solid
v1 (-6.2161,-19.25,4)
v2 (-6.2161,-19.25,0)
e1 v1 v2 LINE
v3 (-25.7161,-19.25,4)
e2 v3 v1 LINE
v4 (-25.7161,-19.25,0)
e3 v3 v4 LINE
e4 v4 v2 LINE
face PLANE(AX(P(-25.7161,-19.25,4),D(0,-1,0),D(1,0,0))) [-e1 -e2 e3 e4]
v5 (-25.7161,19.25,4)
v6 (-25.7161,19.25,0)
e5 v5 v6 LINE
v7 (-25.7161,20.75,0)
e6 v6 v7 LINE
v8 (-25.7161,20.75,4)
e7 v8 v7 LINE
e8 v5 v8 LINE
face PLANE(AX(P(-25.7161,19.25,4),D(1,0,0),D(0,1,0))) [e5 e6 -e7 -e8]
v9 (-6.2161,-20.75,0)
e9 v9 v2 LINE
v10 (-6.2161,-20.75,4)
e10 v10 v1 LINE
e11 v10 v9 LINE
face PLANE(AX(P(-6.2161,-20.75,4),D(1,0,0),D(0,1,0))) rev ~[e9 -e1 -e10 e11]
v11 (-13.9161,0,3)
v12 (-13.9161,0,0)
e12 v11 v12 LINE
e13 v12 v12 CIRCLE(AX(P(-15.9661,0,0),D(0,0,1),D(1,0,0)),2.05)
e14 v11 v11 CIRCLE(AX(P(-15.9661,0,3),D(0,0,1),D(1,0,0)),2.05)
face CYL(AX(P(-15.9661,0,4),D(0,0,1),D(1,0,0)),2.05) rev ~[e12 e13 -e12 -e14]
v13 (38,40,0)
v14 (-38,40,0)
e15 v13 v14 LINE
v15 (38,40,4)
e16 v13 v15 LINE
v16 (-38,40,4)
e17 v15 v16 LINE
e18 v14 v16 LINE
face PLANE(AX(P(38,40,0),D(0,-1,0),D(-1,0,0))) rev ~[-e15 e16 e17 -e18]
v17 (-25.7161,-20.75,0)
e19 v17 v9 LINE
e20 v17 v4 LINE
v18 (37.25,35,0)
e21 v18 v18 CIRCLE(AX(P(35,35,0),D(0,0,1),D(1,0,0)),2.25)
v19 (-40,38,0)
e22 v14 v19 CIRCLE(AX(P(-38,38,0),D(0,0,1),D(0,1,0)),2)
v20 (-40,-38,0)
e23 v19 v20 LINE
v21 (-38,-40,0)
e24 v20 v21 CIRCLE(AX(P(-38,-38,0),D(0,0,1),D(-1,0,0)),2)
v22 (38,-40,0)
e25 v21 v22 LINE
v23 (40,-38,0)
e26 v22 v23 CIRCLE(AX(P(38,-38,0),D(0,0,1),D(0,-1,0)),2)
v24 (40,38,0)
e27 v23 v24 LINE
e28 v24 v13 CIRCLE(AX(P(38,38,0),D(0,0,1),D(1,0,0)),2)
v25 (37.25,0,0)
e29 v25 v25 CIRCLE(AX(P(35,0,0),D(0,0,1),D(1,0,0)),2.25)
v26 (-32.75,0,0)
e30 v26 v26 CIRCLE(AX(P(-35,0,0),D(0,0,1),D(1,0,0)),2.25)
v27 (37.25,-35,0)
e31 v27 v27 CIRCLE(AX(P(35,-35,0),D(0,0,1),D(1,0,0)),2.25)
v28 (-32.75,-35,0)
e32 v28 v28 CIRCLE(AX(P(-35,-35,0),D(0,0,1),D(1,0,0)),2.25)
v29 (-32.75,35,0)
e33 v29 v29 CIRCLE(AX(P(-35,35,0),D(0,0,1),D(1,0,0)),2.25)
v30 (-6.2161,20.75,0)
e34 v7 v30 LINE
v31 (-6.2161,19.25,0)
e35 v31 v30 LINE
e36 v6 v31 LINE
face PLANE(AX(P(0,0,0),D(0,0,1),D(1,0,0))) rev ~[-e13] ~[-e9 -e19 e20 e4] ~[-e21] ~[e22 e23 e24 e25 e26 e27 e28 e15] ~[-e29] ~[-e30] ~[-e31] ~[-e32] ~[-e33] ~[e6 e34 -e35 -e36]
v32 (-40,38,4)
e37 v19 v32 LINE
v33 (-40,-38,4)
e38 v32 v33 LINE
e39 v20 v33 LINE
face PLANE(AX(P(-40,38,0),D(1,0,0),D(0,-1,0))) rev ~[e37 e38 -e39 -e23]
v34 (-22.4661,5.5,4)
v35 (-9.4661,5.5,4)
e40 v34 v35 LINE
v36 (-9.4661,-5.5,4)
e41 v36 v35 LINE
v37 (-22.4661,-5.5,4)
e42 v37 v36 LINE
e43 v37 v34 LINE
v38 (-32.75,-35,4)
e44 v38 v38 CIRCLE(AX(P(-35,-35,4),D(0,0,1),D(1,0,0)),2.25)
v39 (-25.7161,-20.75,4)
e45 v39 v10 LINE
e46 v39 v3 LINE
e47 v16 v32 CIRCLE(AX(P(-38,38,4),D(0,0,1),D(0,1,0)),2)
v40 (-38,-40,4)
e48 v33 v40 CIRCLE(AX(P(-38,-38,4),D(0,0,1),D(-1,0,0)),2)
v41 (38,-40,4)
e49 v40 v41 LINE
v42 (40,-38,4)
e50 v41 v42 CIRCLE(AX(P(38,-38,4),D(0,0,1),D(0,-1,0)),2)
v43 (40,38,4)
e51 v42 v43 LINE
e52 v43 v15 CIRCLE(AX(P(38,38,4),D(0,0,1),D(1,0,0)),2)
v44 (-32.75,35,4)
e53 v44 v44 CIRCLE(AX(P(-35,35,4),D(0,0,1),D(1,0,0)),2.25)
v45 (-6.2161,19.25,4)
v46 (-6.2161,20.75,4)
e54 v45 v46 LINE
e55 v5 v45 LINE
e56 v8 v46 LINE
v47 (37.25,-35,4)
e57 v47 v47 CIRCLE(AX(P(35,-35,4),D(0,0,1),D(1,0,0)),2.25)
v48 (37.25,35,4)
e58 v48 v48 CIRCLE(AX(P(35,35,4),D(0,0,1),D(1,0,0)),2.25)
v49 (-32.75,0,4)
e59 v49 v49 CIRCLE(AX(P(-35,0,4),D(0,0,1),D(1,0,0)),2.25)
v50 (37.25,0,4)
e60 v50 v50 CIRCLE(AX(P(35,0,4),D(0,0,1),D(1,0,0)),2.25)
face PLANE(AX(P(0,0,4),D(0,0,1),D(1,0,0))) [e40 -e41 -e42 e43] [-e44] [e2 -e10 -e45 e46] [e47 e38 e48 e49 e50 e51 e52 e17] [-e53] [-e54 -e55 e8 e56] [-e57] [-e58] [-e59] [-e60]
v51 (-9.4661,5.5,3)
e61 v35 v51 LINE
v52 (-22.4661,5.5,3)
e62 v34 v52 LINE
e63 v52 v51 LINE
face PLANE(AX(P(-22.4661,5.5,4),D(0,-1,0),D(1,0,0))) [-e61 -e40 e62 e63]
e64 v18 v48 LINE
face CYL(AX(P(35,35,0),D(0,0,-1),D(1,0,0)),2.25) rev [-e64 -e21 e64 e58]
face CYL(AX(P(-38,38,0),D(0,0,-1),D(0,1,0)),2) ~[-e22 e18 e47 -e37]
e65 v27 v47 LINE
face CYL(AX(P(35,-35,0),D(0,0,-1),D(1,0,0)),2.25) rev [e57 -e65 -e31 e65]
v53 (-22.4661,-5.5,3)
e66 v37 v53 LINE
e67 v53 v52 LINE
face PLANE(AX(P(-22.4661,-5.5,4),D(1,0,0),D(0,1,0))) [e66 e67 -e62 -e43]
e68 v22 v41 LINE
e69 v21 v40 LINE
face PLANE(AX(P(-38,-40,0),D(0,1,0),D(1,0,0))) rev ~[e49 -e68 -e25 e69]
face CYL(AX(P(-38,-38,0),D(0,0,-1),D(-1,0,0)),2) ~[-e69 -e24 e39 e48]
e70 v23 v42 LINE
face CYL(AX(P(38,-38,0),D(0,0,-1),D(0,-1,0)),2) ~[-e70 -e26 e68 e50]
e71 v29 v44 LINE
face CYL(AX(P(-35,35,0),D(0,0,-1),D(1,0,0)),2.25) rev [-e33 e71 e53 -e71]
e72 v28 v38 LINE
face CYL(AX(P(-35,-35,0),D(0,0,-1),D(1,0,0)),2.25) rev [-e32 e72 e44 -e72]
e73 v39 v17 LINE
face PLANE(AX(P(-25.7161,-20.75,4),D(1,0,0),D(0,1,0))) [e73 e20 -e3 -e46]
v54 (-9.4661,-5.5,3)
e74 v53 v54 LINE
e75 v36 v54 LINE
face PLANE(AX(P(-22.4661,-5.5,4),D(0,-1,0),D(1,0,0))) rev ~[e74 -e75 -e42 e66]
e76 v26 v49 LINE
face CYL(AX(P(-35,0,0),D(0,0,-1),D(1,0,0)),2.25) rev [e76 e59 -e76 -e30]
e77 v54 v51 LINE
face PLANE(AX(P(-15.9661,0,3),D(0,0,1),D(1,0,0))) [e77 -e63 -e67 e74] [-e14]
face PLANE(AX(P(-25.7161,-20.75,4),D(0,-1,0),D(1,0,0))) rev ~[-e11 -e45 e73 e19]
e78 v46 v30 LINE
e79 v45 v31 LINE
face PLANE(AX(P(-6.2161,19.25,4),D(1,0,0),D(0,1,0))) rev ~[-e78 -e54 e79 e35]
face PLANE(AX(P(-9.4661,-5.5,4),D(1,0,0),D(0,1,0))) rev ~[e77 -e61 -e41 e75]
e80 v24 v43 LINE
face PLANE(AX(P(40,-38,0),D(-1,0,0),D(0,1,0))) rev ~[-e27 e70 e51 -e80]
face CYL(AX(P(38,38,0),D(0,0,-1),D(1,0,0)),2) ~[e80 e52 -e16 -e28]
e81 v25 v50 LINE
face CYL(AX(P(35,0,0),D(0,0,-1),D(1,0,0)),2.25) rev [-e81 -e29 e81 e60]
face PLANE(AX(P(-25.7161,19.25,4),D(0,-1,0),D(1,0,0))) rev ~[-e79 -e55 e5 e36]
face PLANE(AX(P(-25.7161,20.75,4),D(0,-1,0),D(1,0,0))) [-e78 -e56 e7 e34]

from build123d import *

# Parameters (mm, degrees)
F0_R     = 2.25
F1_DEPTH = 4
F2_R     = 2.05
F3_DEPTH = 5
F4_W     = 13
F4_H     = 11
F5_DEPTH = 1
F6_W     = 19.5
F6_H     = 1.5
F7_DEPTH = 25


# Not quite as in the source:
# - a feature names something its author has since deleted; it is built from what else it names


with BuildPart() as f1:
    # F0 (on Top) → F1 (new body)
    with BuildSketch(Plane.XY):
        with BuildLine():
            ThreePointArc((40, 38), (39.4142135624, 39.4142135624), (38, 40))
            Line((38, 40), (-38, 40))
            ThreePointArc((-38, 40), (-39.4142135624, 39.4142135624), (-40, 38))
            Line((-40, 38), (-40, -38))
            ThreePointArc((-40, -38), (-39.4142135624, -39.4142135624), (-38, -40))
            Line((-38, -40), (38, -40))
            ThreePointArc((38, -40), (39.4142135624, -39.4142135624), (40, -38))
            Line((40, -38), (40, 38))
        make_face()
        with Locations((-35, -35)):
            Circle(F0_R, mode=Mode.SUBTRACT)
        with Locations((35, -35)):
            Circle(F0_R, mode=Mode.SUBTRACT)
        with Locations((-35, 0)):
            Circle(F0_R, mode=Mode.SUBTRACT)
        with Locations((-35, 35)):
            Circle(F0_R, mode=Mode.SUBTRACT)
        with Locations((35, 0)):
            Circle(F0_R, mode=Mode.SUBTRACT)
        with Locations((35, 35)):
            Circle(F0_R, mode=Mode.SUBTRACT)
    extrude(amount=F1_DEPTH)

    # F2 (on face) → F3 (cut)
    with BuildSketch(Plane.XY.offset(4)):
        with Locations((-15.9661, 0)):
            Circle(F2_R)
    extrude(amount=-F3_DEPTH, mode=Mode.SUBTRACT)

    # F4 (on face) → F5 (cut)
    with BuildSketch(Plane.XY.offset(4)):
        with Locations((-15.9661, 0)):
            Rectangle(F4_W, F4_H)
    extrude(amount=-F5_DEPTH, mode=Mode.SUBTRACT)

    # F6 (on face) → F7 (cut)
    with BuildSketch(Plane.XY.offset(4)):
        with Locations((-15.9661, 20)):
            Rectangle(F6_W, F6_H)
        with Locations((-15.9661, -20)):
            Rectangle(F6_W, F6_H)
    extrude(amount=-F7_DEPTH, mode=Mode.SUBTRACT)


solid = f1.part
